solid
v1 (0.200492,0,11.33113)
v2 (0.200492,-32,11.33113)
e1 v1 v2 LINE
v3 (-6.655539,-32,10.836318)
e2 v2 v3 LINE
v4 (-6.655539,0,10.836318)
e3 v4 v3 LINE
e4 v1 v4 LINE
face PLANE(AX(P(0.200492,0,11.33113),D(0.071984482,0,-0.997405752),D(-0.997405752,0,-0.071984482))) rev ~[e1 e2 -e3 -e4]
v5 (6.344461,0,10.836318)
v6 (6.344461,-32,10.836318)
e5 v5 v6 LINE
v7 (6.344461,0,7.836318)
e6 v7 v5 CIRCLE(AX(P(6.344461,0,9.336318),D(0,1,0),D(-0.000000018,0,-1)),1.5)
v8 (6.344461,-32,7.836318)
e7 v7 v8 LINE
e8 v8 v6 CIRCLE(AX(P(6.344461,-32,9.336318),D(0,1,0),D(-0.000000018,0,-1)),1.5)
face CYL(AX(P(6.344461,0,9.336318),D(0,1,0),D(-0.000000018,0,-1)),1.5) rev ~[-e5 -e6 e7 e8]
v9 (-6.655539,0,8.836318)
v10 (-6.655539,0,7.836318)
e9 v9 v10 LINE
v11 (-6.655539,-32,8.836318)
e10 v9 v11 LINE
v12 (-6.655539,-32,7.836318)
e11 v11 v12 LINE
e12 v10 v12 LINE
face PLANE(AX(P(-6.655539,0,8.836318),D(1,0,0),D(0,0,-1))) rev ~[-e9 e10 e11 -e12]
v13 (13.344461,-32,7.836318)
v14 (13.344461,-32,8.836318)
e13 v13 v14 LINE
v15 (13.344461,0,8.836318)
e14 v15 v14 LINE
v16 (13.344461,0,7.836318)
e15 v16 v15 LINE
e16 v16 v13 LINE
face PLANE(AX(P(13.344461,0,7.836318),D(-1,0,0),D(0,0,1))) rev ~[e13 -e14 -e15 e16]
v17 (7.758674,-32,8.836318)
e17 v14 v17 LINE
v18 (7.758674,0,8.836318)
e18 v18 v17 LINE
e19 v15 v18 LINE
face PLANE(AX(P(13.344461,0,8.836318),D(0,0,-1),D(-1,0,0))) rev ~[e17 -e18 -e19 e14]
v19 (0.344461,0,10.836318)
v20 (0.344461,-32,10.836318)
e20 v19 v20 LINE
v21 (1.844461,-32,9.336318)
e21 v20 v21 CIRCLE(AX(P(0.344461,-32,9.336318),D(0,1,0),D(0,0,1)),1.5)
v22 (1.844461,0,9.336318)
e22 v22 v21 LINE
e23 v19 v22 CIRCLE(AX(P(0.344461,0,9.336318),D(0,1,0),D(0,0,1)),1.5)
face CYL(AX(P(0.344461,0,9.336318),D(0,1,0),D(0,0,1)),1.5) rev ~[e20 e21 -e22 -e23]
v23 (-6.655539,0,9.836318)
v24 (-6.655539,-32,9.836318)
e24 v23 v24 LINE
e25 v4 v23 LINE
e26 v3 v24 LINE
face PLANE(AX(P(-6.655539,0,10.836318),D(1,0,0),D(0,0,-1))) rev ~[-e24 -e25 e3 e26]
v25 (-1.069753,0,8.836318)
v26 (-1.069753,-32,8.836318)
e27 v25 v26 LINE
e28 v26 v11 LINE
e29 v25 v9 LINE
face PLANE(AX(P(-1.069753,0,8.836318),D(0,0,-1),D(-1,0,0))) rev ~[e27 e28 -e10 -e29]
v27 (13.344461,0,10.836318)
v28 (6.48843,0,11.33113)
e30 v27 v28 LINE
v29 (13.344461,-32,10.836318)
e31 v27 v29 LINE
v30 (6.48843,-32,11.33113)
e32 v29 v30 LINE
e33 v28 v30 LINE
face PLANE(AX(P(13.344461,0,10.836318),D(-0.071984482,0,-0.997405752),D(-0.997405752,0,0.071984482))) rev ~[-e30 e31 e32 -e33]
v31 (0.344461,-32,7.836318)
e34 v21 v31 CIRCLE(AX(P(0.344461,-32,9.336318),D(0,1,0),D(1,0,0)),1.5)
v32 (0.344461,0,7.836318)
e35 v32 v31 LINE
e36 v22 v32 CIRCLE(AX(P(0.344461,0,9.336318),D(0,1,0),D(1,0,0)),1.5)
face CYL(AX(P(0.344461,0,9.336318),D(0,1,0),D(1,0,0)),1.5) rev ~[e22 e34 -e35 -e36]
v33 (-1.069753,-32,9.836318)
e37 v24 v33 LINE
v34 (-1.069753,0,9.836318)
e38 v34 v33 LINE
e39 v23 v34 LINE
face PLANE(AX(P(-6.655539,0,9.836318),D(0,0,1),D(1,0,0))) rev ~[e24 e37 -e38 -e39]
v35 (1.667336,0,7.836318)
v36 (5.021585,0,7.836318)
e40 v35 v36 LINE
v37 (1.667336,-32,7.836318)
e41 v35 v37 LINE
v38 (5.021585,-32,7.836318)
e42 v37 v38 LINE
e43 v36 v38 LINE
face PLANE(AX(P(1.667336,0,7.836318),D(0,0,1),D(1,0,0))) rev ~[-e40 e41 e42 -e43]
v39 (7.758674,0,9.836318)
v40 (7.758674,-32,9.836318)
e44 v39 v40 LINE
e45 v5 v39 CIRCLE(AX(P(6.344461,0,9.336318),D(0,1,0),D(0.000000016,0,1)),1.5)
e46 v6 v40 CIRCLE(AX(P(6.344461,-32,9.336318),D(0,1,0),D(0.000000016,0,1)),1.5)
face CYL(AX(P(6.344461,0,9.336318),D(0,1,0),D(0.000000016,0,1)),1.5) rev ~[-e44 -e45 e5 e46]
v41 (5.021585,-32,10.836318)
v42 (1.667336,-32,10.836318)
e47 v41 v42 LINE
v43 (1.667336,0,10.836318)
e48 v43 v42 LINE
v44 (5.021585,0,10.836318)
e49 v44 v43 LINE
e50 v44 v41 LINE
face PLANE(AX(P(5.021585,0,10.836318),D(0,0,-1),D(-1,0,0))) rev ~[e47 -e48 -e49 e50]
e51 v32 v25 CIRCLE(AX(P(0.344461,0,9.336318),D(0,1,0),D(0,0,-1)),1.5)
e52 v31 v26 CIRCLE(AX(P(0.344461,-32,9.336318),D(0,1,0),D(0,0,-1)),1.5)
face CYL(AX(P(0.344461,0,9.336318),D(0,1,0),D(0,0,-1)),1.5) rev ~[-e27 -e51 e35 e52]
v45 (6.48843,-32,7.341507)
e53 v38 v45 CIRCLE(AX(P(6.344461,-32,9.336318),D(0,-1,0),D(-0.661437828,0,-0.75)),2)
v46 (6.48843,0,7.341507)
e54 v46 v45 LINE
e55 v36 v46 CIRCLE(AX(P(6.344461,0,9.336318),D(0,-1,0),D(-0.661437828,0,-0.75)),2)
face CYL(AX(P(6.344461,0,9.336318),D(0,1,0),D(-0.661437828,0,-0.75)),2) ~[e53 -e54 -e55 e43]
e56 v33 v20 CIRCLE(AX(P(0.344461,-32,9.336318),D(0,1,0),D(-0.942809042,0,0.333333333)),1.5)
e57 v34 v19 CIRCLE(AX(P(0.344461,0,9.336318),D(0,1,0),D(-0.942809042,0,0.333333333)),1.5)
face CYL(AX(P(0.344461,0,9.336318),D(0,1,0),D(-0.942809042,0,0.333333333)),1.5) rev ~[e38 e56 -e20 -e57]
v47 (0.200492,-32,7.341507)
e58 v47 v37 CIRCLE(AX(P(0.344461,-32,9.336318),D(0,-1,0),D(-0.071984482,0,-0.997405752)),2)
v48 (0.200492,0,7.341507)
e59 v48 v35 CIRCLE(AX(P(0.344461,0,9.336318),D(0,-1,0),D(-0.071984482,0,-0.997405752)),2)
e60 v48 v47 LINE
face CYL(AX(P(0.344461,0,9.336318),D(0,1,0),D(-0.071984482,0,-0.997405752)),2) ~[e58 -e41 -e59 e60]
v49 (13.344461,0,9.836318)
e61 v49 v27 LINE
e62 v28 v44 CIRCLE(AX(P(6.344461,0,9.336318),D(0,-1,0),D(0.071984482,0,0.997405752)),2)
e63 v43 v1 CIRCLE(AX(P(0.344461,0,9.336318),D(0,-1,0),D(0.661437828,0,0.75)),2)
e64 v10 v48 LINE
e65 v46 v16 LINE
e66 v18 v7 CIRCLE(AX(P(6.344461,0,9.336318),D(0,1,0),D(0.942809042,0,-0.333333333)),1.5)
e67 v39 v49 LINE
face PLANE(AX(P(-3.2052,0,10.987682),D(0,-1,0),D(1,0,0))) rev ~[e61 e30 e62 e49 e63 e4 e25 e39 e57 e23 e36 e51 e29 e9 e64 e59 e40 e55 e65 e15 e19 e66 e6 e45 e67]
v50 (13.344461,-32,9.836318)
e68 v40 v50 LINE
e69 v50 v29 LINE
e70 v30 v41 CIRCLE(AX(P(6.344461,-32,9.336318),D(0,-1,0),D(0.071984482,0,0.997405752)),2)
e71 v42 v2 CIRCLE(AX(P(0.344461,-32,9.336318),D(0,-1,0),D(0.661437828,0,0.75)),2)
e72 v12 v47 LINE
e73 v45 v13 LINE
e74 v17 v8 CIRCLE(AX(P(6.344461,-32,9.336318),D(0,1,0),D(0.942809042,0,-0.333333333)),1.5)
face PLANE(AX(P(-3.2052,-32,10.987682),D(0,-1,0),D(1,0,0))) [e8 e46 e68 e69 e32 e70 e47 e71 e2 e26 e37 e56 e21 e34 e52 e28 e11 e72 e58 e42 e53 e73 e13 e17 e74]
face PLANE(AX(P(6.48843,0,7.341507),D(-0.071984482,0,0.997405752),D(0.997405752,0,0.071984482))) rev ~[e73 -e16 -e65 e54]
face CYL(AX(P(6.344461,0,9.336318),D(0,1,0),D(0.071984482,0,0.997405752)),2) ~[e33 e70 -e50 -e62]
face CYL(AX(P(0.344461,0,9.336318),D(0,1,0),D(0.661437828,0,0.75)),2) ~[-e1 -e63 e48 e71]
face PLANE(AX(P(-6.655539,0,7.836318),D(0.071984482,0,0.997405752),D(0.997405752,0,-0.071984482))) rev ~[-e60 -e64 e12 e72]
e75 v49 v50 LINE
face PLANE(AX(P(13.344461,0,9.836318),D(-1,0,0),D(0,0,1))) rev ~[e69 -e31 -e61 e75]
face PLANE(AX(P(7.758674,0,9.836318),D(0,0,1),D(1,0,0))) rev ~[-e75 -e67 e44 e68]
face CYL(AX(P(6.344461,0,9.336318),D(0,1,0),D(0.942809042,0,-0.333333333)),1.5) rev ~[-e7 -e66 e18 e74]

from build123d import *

# Parameters (mm, degrees)
F1_DEPTH = 32


# Not quite as in the source:
# - a feature names something its author has since deleted; it is built from what else it names


with BuildPart() as f1:
    # F0 (on Front) → F1 (new body)
    with BuildSketch(Plane.XZ):
        with BuildLine():
            Line((0.200491711, 11.3311297744), (-6.6555393256, 10.8363182701))
            Line((-6.6555393256, 10.8363182701), (-0.9784149812, 10.8363182701))
            ThreePointArc((-0.9784149812, 10.8363182701), (-0.429566386, 11.1804663417), (0.200491711, 11.3311297744))
        make_face()
        with BuildLine():
            Line((-0.9784149812, 10.8363182701), (-6.6555393256, 10.8363182701))
            Line((-6.6555393256, 10.8363182701), (-6.6555393256, 9.8363182701))
            Line((-6.6555393256, 9.8363182701), (-1.5920309988, 9.8363182701))
            ThreePointArc((-1.5920309988, 9.8363182701), (-1.3602002438, 10.382325514), (-0.9784149812, 10.8363182701))
        make_face()
        with BuildLine():
            ThreePointArc((0.200491711, 11.3311297744), (-0.429566386, 11.1804663417), (-0.9784149812, 10.8363182701))
            Line((-0.9784149812, 10.8363182701), (0.3444606744, 10.8363182701))
            Line((0.3444606744, 10.8363182701), (1.6673363299, 10.8363182701))
            ThreePointArc((1.6673363299, 10.8363182701), (0.9837296736, 11.2314001012), (0.200491711, 11.3311297744))
        make_face()
        with BuildLine():
            Line((0.3444606744, 10.8363182701), (-0.9784149812, 10.8363182701))
            ThreePointArc((-0.9784149812, 10.8363182701), (-1.3602002438, 10.382325514), (-1.5920309988, 9.8363182701))
            Line((-1.5920309988, 9.8363182701), (-1.069752888, 9.8363182701))
            ThreePointArc((-1.069752888, 9.8363182701), (-0.5215647294, 10.5610631415), (0.3444606744, 10.8363182701))
        make_face()
        with BuildLine():
            Line((1.6673363299, 10.8363182701), (0.3444606744, 10.8363182701))
            ThreePointArc((0.3444606744, 10.8363182701), (1.4051208461, 10.3969784419), (1.8444606744, 9.3363182701))
            ThreePointArc((1.8444606744, 9.3363182701), (1.4051208461, 8.2756580983), (0.3444606744, 7.8363182701))
            Line((0.3444606744, 7.8363182701), (1.6673363299, 7.8363182701))
            ThreePointArc((1.6673363299, 7.8363182701), (2.1673363299, 8.5134426146), (2.3444606744, 9.3363182701))
            ThreePointArc((2.3444606744, 9.3363182701), (2.1673363299, 10.1591939256), (1.6673363299, 10.8363182701))
        make_face()
        with BuildLine():
            Line((-1.5920309988, 8.8363182701), (-6.6555393256, 8.8363182701))
            Line((-6.6555393256, 8.8363182701), (-6.6555393256, 7.8363182701))
            Line((-6.6555393256, 7.8363182701), (-0.9784149812, 7.8363182701))
            ThreePointArc((-0.9784149812, 7.8363182701), (-1.3602002438, 8.2903110262), (-1.5920309988, 8.8363182701))
        make_face()
        with BuildLine():
            Line((5.0215850188, 10.8363182701), (1.6673363299, 10.8363182701))
            ThreePointArc((1.6673363299, 10.8363182701), (2.1673363299, 10.1591939256), (2.3444606744, 9.3363182701))
            ThreePointArc((2.3444606744, 9.3363182701), (2.1673363299, 8.5134426146), (1.6673363299, 7.8363182701))
            Line((1.6673363299, 7.8363182701), (5.0215850188, 7.8363182701))
            ThreePointArc((5.0215850188, 7.8363182701), (4.3444606744, 9.3363182701), (5.0215850188, 10.8363182701))
        make_face()
        with BuildLine():
            Line((-1.069752888, 8.8363182701), (-1.5920309988, 8.8363182701))
            ThreePointArc((-1.5920309988, 8.8363182701), (-1.3602002438, 8.2903110262), (-0.9784149812, 7.8363182701))
            Line((-0.9784149812, 7.8363182701), (0.3444606744, 7.8363182701))
            ThreePointArc((0.3444606744, 7.8363182701), (-0.5215647294, 8.1115733987), (-1.069752888, 8.8363182701))
        make_face()
        with BuildLine():
            Line((-0.9784149812, 7.8363182701), (-6.6555393256, 7.8363182701))
            Line((-6.6555393256, 7.8363182701), (0.200491711, 7.3415067658))
            ThreePointArc((0.200491711, 7.3415067658), (-0.429566386, 7.4921701986), (-0.9784149812, 7.8363182701))
        make_face()
        with BuildLine():
            ThreePointArc((6.4884296377, 11.3311297744), (5.7051916751, 11.2314001012), (5.0215850188, 10.8363182701))
            Line((5.0215850188, 10.8363182701), (6.344460699, 10.8363182701))
            Line((6.344460699, 10.8363182701), (7.6673363299, 10.8363182701))
            ThreePointArc((7.6673363299, 10.8363182701), (7.1184877347, 11.1804663417), (6.4884296377, 11.3311297744))
        make_face()
        with BuildLine():
            Line((6.344460699, 10.8363182701), (5.0215850188, 10.8363182701))
            ThreePointArc((5.0215850188, 10.8363182701), (4.3444606744, 9.3363182701), (5.0215850188, 7.8363182701))
            Line((5.0215850188, 7.8363182701), (6.3444606473, 7.8363182701))
            ThreePointArc((6.3444606473, 7.8363182701), (4.8444606744, 9.336318296), (6.344460699, 10.8363182701))
        make_face()
        with BuildLine():
            Line((1.6673363299, 7.8363182701), (0.3444606744, 7.8363182701))
            Line((0.3444606744, 7.8363182701), (-0.9784149812, 7.8363182701))
            ThreePointArc((-0.9784149812, 7.8363182701), (-0.429566386, 7.4921701986), (0.200491711, 7.3415067658))
            ThreePointArc((0.200491711, 7.3415067658), (0.9837296736, 7.441236439), (1.6673363299, 7.8363182701))
        make_face()
        with BuildLine():
            Line((7.6673363299, 10.8363182701), (6.344460699, 10.8363182701))
            ThreePointArc((6.344460699, 10.8363182701), (7.2104860882, 10.5610631344), (7.7586742367, 9.8363182701))
            Line((7.7586742367, 9.8363182701), (8.2809523475, 9.8363182701))
            ThreePointArc((8.2809523475, 9.8363182701), (8.0491215925, 10.382325514), (7.6673363299, 10.8363182701))
        make_face()
        with BuildLine():
            Line((13.3444606744, 10.8363182701), (6.4884296377, 11.3311297744))
            ThreePointArc((6.4884296377, 11.3311297744), (7.1184877347, 11.1804663417), (7.6673363299, 10.8363182701))
            Line((7.6673363299, 10.8363182701), (13.3444606744, 10.8363182701))
        make_face()
        with BuildLine():
            Line((6.3444606473, 7.8363182701), (5.0215850188, 7.8363182701))
            ThreePointArc((5.0215850188, 7.8363182701), (5.7051916751, 7.441236439), (6.4884296377, 7.3415067658))
            ThreePointArc((6.4884296377, 7.3415067658), (7.1184877347, 7.4921701986), (7.6673363299, 7.8363182701))
            Line((7.6673363299, 7.8363182701), (6.3444606473, 7.8363182701))
        make_face()
        with BuildLine():
            Line((13.3444606744, 10.8363182701), (7.6673363299, 10.8363182701))
            ThreePointArc((7.6673363299, 10.8363182701), (8.0491215925, 10.382325514), (8.2809523475, 9.8363182701))
            Line((8.2809523475, 9.8363182701), (13.3444606744, 9.8363182701))
            Line((13.3444606744, 9.8363182701), (13.3444606744, 10.8363182701))
        make_face()
        with BuildLine():
            ThreePointArc((7.7586742367, 8.8363182701), (7.2104860671, 8.1115733909), (6.3444606473, 7.8363182701))
            Line((6.3444606473, 7.8363182701), (7.6673363299, 7.8363182701))
            ThreePointArc((7.6673363299, 7.8363182701), (8.0491215925, 8.2903110262), (8.2809523475, 8.8363182701))
            Line((8.2809523475, 8.8363182701), (7.7586742367, 8.8363182701))
        make_face()
        with BuildLine():
            ThreePointArc((7.6673363299, 7.8363182701), (7.1184877347, 7.4921701986), (6.4884296377, 7.3415067658))
            Line((6.4884296377, 7.3415067658), (13.3444606744, 7.8363182701))
            Line((13.3444606744, 7.8363182701), (7.6673363299, 7.8363182701))
        make_face()
        with BuildLine():
            ThreePointArc((8.2809523475, 8.8363182701), (8.0491215925, 8.2903110262), (7.6673363299, 7.8363182701))
            Line((7.6673363299, 7.8363182701), (13.3444606744, 7.8363182701))
            Line((13.3444606744, 7.8363182701), (13.3444606744, 8.8363182701))
            Line((13.3444606744, 8.8363182701), (8.2809523475, 8.8363182701))
        make_face()
    extrude(amount=F1_DEPTH)


solid = f1.part
